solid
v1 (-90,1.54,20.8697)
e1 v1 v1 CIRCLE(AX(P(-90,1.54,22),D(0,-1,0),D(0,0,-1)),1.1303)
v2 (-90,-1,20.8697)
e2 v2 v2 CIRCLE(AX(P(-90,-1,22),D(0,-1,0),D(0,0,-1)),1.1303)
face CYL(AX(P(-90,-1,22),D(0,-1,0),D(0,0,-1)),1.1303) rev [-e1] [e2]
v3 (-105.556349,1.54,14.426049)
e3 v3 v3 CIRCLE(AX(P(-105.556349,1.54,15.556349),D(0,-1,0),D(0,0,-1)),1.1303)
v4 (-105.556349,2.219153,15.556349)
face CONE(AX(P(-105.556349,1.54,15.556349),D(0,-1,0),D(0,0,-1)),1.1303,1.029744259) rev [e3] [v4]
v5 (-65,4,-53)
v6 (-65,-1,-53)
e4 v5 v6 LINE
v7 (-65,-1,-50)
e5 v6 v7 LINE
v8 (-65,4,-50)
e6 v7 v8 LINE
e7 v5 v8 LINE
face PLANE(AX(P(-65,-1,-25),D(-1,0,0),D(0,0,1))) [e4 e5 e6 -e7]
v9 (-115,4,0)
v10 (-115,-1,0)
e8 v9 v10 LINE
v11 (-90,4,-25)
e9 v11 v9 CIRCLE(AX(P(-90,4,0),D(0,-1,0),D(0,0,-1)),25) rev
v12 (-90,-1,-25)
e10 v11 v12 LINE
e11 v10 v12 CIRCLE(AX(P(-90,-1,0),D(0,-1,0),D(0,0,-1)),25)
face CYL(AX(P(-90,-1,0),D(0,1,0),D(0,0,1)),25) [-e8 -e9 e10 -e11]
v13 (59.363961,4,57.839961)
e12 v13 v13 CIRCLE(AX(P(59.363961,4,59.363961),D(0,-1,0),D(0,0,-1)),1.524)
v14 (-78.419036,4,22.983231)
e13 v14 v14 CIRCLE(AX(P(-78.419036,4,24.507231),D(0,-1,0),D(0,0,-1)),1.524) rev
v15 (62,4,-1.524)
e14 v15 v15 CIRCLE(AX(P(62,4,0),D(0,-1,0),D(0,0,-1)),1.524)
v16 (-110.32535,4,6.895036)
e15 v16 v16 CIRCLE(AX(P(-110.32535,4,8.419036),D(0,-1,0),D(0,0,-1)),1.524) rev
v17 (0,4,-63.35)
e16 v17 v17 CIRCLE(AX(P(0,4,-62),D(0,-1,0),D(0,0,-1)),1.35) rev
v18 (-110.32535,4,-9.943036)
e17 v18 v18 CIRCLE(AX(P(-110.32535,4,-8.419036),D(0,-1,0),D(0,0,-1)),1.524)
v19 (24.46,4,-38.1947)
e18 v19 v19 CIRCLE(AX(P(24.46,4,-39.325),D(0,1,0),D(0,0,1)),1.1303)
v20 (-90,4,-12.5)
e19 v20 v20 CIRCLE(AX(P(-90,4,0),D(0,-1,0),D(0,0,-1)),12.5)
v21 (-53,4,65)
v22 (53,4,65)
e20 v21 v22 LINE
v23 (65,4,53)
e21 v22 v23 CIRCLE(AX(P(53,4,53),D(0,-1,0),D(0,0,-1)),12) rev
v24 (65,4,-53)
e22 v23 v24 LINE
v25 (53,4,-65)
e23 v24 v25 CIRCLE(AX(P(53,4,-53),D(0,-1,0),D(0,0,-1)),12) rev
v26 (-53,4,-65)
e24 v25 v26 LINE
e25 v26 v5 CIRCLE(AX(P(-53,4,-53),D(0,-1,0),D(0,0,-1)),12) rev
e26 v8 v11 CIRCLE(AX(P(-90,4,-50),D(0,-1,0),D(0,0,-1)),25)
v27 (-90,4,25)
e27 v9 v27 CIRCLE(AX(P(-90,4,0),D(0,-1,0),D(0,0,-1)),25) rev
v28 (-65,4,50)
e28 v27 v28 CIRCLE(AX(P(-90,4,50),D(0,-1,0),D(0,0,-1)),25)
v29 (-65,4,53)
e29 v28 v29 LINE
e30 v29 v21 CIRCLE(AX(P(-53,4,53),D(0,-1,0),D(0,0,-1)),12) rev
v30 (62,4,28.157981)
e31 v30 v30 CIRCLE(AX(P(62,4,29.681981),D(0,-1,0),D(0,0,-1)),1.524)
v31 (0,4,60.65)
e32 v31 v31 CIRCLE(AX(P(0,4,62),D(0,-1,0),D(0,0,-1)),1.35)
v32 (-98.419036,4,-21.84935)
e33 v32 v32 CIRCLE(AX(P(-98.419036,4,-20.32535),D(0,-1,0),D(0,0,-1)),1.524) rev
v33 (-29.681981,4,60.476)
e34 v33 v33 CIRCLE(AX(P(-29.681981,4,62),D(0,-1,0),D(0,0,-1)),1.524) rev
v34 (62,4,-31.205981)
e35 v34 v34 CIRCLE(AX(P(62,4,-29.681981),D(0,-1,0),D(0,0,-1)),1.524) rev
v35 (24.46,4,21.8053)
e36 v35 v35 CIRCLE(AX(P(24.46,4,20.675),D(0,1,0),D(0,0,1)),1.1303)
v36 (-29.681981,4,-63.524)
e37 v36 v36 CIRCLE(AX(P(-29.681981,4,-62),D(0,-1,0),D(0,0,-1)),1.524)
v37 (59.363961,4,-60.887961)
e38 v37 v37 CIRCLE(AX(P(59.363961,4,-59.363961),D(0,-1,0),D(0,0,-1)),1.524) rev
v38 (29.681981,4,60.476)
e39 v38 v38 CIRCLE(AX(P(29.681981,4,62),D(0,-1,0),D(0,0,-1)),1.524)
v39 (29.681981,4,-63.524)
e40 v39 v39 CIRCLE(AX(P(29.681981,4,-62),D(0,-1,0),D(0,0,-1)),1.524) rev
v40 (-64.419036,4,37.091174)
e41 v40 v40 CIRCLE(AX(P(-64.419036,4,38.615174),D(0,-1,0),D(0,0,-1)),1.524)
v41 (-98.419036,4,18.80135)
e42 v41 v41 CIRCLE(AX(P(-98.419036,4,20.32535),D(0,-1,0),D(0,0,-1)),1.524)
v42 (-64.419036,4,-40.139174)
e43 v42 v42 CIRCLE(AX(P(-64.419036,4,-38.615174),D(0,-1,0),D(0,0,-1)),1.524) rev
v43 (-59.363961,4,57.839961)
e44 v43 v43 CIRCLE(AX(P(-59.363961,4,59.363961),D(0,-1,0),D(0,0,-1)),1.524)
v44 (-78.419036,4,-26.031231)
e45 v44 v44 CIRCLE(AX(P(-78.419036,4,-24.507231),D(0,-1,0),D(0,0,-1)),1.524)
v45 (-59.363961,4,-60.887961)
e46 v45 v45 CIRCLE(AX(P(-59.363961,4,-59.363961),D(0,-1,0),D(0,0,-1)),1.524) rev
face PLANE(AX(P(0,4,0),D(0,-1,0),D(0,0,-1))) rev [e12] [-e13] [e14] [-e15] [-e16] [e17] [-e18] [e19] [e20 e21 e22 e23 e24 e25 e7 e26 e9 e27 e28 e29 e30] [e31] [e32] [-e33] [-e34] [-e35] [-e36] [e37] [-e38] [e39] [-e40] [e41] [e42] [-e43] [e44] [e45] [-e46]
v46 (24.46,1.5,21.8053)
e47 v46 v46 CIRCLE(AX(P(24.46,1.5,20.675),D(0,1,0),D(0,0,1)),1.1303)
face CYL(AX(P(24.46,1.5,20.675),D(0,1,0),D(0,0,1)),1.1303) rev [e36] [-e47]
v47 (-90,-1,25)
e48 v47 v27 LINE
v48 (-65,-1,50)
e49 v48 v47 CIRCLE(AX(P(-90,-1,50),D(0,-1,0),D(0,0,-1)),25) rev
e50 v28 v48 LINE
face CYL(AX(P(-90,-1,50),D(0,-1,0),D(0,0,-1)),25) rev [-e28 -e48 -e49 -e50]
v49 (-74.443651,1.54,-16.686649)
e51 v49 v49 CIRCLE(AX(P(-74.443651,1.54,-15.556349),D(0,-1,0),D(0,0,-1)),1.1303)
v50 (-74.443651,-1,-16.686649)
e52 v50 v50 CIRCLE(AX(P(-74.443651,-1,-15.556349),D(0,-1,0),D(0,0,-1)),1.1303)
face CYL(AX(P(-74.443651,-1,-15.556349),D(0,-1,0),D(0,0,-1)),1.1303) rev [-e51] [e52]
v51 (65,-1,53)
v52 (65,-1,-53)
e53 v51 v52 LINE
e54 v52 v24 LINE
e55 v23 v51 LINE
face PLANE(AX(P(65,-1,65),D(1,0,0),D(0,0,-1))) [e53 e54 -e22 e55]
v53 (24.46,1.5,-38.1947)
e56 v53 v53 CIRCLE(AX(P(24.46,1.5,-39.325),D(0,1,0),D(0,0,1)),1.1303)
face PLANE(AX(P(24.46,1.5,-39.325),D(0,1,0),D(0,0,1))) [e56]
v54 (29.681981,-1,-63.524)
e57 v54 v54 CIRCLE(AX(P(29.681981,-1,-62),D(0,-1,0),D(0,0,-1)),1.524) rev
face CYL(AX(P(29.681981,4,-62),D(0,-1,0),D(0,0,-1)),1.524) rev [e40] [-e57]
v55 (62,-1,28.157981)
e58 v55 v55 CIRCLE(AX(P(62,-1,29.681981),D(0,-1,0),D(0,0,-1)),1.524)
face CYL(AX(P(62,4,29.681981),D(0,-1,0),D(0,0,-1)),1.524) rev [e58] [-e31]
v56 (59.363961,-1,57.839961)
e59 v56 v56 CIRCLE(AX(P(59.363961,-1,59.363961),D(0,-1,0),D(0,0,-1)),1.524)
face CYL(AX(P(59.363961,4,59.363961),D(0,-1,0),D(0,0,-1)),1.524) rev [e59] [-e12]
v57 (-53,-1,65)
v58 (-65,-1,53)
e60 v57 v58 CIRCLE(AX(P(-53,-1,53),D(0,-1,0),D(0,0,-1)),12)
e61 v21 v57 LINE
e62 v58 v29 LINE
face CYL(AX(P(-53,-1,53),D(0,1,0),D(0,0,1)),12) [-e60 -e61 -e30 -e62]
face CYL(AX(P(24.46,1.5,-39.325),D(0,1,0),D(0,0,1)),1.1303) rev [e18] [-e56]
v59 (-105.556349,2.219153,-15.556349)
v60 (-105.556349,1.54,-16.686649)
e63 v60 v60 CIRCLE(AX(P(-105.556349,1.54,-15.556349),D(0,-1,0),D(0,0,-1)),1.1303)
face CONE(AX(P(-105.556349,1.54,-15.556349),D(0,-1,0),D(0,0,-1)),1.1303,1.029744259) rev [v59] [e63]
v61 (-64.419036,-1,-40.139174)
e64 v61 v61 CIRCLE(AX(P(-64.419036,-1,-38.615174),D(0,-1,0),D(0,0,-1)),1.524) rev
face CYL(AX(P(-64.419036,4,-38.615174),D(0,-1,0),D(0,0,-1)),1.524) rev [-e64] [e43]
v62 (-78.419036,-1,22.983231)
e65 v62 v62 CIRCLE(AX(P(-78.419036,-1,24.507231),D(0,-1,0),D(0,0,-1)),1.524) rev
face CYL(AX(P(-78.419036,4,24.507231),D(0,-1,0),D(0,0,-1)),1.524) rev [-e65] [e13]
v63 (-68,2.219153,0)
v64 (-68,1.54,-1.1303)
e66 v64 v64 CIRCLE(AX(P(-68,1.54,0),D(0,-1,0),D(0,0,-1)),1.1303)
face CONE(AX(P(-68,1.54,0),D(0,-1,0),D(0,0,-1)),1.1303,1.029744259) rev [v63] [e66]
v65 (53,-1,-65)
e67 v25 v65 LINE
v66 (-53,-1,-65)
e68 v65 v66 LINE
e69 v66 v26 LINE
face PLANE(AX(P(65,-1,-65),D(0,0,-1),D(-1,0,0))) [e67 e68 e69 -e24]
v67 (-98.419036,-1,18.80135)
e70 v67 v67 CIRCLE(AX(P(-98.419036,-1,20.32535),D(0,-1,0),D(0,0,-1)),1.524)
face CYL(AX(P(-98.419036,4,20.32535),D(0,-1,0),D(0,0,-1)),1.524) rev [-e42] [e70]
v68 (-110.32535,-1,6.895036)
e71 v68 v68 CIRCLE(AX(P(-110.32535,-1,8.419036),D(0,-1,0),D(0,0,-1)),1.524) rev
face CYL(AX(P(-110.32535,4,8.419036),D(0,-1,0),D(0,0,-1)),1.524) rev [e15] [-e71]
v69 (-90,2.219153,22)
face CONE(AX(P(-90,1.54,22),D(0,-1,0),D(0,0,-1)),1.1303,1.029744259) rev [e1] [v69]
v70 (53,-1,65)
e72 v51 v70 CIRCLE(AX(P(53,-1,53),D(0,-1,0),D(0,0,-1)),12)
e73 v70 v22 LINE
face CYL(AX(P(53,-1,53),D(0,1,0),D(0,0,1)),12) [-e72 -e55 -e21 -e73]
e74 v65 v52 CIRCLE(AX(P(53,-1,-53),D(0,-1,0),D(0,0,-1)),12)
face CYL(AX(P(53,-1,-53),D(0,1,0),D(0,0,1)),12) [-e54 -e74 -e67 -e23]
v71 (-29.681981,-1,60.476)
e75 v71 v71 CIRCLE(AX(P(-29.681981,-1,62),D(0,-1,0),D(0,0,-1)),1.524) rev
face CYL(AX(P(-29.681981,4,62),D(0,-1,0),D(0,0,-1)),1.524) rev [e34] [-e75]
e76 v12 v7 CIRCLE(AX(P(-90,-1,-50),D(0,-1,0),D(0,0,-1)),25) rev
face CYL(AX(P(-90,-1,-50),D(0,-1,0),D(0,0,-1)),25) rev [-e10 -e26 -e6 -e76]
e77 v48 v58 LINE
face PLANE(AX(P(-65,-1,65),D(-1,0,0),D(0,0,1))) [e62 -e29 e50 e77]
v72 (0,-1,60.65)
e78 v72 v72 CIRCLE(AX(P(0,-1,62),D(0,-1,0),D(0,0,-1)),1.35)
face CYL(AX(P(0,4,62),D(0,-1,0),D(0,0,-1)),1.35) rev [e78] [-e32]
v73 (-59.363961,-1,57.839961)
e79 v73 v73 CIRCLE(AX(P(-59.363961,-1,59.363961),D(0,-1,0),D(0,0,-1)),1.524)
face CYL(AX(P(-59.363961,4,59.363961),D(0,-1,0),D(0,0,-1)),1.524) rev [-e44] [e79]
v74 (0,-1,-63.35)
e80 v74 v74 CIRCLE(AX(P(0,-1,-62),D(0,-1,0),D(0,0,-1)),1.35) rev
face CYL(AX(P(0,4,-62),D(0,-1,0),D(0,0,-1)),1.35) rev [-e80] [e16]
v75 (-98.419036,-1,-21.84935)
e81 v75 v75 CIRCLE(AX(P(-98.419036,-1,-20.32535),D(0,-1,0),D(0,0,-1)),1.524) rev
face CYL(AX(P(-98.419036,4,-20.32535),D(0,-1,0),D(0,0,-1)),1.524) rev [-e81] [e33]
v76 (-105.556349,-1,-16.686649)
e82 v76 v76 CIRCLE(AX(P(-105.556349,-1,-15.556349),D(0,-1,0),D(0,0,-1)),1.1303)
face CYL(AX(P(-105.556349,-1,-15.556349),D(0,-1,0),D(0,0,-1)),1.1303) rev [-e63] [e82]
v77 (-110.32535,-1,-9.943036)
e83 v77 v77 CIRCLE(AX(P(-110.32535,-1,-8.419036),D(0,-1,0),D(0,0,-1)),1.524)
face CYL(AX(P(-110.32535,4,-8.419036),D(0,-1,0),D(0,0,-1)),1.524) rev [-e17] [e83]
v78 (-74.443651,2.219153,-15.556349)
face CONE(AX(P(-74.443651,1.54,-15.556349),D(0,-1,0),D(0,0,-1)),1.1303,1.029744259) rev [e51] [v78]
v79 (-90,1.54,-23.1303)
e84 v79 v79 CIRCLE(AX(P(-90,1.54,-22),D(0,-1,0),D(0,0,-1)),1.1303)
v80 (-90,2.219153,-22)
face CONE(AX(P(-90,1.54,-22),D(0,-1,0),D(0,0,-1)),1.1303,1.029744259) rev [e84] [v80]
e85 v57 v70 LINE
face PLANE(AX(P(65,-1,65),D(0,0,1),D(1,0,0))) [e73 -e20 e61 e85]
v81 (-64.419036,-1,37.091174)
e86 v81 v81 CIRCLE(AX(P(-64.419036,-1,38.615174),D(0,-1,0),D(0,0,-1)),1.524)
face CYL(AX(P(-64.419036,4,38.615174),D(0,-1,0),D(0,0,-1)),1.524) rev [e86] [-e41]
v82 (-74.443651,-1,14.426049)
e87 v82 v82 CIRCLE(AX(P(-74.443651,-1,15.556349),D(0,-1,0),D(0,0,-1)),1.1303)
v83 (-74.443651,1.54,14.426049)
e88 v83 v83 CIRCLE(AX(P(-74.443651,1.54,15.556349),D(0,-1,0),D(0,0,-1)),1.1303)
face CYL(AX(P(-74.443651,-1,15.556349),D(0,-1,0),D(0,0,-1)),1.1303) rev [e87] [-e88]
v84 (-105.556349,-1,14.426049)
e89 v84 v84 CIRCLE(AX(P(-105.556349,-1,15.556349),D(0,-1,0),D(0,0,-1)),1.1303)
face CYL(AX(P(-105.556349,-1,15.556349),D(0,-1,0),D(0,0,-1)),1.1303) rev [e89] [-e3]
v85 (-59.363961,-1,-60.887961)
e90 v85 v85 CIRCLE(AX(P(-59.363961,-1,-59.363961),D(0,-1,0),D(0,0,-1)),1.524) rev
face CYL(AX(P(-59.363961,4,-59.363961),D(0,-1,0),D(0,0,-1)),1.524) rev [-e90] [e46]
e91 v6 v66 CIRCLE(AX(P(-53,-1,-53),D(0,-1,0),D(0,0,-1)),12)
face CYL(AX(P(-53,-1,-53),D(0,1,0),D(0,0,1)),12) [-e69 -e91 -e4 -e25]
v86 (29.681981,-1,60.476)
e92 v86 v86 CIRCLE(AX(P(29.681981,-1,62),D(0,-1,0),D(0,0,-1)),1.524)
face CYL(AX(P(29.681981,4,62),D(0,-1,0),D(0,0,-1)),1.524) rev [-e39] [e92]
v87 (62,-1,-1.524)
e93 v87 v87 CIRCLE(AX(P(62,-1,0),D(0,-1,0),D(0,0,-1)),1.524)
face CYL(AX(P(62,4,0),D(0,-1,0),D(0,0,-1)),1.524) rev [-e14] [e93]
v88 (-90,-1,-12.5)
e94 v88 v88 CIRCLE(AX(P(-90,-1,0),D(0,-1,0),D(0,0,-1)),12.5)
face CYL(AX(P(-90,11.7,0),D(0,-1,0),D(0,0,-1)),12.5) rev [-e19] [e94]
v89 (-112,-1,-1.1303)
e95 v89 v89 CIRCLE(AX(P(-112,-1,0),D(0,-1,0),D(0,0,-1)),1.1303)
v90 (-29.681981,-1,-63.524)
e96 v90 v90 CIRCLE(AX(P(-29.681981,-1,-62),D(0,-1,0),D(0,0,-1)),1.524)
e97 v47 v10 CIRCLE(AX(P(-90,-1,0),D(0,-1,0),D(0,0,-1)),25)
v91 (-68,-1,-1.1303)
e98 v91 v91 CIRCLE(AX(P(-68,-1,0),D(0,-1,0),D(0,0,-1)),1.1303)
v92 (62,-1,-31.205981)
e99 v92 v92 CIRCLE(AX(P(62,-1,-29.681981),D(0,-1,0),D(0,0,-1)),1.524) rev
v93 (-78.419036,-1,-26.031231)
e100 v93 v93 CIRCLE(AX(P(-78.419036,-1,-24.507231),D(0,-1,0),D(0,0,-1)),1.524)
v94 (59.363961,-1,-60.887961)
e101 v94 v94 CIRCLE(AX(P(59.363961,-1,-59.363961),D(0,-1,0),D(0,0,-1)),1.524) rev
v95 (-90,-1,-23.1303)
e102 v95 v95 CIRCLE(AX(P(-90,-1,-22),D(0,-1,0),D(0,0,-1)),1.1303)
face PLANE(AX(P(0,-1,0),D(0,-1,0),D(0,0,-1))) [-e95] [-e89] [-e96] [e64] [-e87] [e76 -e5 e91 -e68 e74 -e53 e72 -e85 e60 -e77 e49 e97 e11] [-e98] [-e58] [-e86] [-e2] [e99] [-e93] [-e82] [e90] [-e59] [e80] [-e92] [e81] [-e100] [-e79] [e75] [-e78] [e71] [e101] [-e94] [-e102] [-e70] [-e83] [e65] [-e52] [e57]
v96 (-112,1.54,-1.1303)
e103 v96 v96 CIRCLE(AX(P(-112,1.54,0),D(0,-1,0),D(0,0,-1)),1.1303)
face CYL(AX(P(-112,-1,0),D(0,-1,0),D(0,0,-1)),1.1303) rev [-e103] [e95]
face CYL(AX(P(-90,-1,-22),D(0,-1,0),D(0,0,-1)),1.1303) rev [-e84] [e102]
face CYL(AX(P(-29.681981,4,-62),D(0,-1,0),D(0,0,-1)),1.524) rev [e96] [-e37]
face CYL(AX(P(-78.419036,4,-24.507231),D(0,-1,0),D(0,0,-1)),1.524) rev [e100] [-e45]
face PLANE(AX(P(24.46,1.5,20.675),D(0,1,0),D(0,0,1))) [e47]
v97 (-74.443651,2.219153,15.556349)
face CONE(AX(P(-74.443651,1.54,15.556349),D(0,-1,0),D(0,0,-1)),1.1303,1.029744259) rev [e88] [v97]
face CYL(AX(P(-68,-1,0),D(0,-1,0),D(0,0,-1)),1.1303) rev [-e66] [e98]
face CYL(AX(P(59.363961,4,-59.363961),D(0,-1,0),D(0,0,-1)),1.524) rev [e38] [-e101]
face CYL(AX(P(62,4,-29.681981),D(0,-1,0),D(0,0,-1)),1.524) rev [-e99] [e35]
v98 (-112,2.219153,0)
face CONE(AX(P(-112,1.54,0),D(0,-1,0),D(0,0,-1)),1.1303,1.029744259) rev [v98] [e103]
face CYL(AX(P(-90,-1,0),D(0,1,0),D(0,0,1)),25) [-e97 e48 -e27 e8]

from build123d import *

# Parameters (mm, degrees)
BOSS_EXTRUDE1_DEPTH           = 4
BOSS_EXTRUDE1_DEPTH_BACK      = 1
FILLET1_START                 = -2
FILLET1_DEPTH                 = 7
FILLET1_START_2               = -1
FILLET1_2_DEPTH               = 5
SKETCH39_R                    = 12.5
CUT_EXTRUDE3_DEPTH            = 12.7
TAP_DRILL_FOR_4_40_TAP1_D     = 2.2606
TAP_DRILL_FOR_4_40_TAP1_DEPTH = 2.54
TAP_DRILL_FOR_4_40_TAP1_TIP   = 0.679152758
FILLET2_R                     = 12
SKETCH44_R                    = 1.524
SKETCH44_R_2                  = 1.35
CUT_EXTRUDE4_DEPTH            = 133.193040664
SKETCH47_R                    = 1.1303
CUT_EXTRUDE5_DEPTH            = 2.5


with BuildPart() as part:
    # Sketch1 → Boss-Extrude1 (new, two sides: drawn at the far end of the back side and taken through both)
    with BuildSketch(Plane(origin=(0, 0, 0), x_dir=(1, 0, 0), z_dir=(0, 1, 0)).offset(-BOSS_EXTRUDE1_DEPTH_BACK)):
        Polygon((-65, 25), (-65, 65), (65, 65), (65, -65), (-65, -65), (-65, -25), (-115, -25), (-115, 25), align=None)
    extrude(amount=BOSS_EXTRUDE1_DEPTH + BOSS_EXTRUDE1_DEPTH_BACK)

    # Fillet1: read off the stored shape, not the designer's step
    # Fillet1 outline → Fillet1 (cut)
    with BuildSketch(Plane(origin=(0, 0, 0), x_dir=(1, 0, 0), z_dir=(0, 1, 0)).offset(FILLET1_START)):
        with BuildLine():
            ThreePointArc((-90, -25), (-107.67766953, -17.67766953), (-115, 0))
            Line((-115, 0), (-115, -25))
            Line((-115, -25), (-90, -25))
        make_face()
        with BuildLine():
            ThreePointArc((-115, 0), (-107.67766953, 17.67766953), (-90, 25))
            Line((-90, 25), (-115, 25))
            Line((-115, 25), (-115, 0))
        make_face()
    extrude(amount=FILLET1_DEPTH, mode=Mode.SUBTRACT)

    # Fillet1 2 outline → Fillet1 2 (add)
    with BuildSketch(Plane(origin=(0, 0, 0), x_dir=(1, 0, 0), z_dir=(0, 1, 0)).offset(FILLET1_START_2)):
        with BuildLine():
            Line((-65, 25), (-65, 50))
            ThreePointArc((-65, 50), (-72.32233047, 32.32233047), (-90, 25))
            Line((-90, 25), (-65, 25))
        make_face()
        with BuildLine():
            Line((-65, -25), (-90, -25))
            ThreePointArc((-90, -25), (-72.32233047, -32.32233047), (-65, -50))
            Line((-65, -50), (-65, -25))
        make_face()
    extrude(amount=FILLET1_2_DEPTH)

    # Sketch39 → Cut-Extrude3 (cut)
    with BuildSketch(Plane.XZ.offset(1)):
        with Locations(Location((-90, 0, 0), (0, 0, 270))):
            Circle(SKETCH39_R)
    extrude(amount=-CUT_EXTRUDE3_DEPTH, mode=Mode.SUBTRACT)

    # Tap Drill for #4-40 Tap1
    with Locations(Plane(origin=(0, -1, 0), x_dir=(-1, 0, 0), z_dir=(0, -1, 0))):
        with Locations((90, -22), (74.443650814, -15.556349186), (68, 0), (74.443650814, 15.556349186), (90, 22), (105.556349186, 15.556349186), (112, 0), (105.556349186, -15.556349186)):
            Hole(TAP_DRILL_FOR_4_40_TAP1_D / 2, depth=TAP_DRILL_FOR_4_40_TAP1_DEPTH)
            with Locations((0, 0, -(TAP_DRILL_FOR_4_40_TAP1_DEPTH + TAP_DRILL_FOR_4_40_TAP1_TIP / 2))):  # 118° drill point
                Cone(0, TAP_DRILL_FOR_4_40_TAP1_D / 2, TAP_DRILL_FOR_4_40_TAP1_TIP, mode=Mode.SUBTRACT)

    # Fillet2
    fillet2_edges = [part.edges().sort_by_distance(p)[0] for p in [
        (65, 1.5, -65),
        (65, 1.5, 65),
        (-65, 1.5, 65),
        (-65, 1.5, -65),
    ]]
    fillet(fillet2_edges, radius=FILLET2_R)

    # Sketch44 → Cut-Extrude4 (cut, through all)
    with BuildSketch(Plane.XZ.offset(1)):
        with Locations(Location((-64.419035512, 38.615174316, 0), (0, 0, 270))):
            Circle(SKETCH44_R)
        with Locations(Location((-98.419035512, 20.325349715, 0), (0, 0, 270))):
            Circle(SKETCH44_R)
        with Locations(Location((-110.325349715, 8.419035512, 0), (0, 0, 270))):
            Circle(SKETCH44_R)
        with Locations(Location((-110.325349715, -8.419035512, 0), (0, 0, 270))):
            Circle(SKETCH44_R)
        with Locations(Location((-98.419035512, -20.325349715, 0), (0, 0, 270))):
            Circle(SKETCH44_R)
        with Locations(Location((-64.419035512, -38.615174316, 0), (0, 0, 270))):
            Circle(SKETCH44_R)
        with Locations(Location((-59.363961031, -59.363961031, 0), (0, 0, 270))):
            Circle(SKETCH44_R)
        with Locations(Location((-29.681980515, -62, 0), (0, 0, 270))):
            Circle(SKETCH44_R)
        with Locations(Location((0, -62, 0), (0, 0, 270))):
            Circle(SKETCH44_R_2)
        with Locations(Location((29.681980515, -62, 0), (0, 0, 270))):
            Circle(SKETCH44_R)
        with Locations(Location((59.363961031, -59.363961031, 0), (0, 0, 270))):
            Circle(SKETCH44_R)
        with Locations(Location((62, -29.681980515, 0), (0, 0, 270))):
            Circle(SKETCH44_R)
        with Locations(Location((62, 0, 0), (0, 0, 270))):
            Circle(SKETCH44_R)
        with Locations(Location((62, 29.681980515, 0), (0, 0, 270))):
            Circle(SKETCH44_R)
        with Locations(Location((59.363961031, 59.363961031, 0), (0, 0, 270))):
            Circle(SKETCH44_R)
        with Locations(Location((29.681980515, 62, 0), (0, 0, 270))):
            Circle(SKETCH44_R)
        with Locations(Location((0, 62, 0), (0, 0, 270))):
            Circle(SKETCH44_R_2)
        with Locations(Location((-29.681980515, 62, 0), (0, 0, 270))):
            Circle(SKETCH44_R)
        with Locations(Location((-59.363961031, 59.363961031, 0), (0, 0, 270))):
            Circle(SKETCH44_R)
        with Locations(Location((-78.419035512, -24.507231191, 0), (0, 0, 270))):
            Circle(SKETCH44_R)
        with Locations(Location((-78.419035512, 24.507231191, 0), (0, 0, 270))):
            Circle(SKETCH44_R)
    extrude(amount=-CUT_EXTRUDE4_DEPTH, mode=Mode.SUBTRACT)

    # Sketch47 → Cut-Extrude5 (cut)
    with BuildSketch(Plane(origin=(0, 4, 0), x_dir=(1, 0, 0), z_dir=(0, 1, 0))):
        with Locations(Location((24.46, -20.675, 0), (0, 0, 270))):
            Circle(SKETCH47_R)
        with Locations(Location((24.46, 39.325, 0), (0, 0, 270))):
            Circle(SKETCH47_R)
    extrude(amount=-CUT_EXTRUDE5_DEPTH, mode=Mode.SUBTRACT)


solid = part.part
